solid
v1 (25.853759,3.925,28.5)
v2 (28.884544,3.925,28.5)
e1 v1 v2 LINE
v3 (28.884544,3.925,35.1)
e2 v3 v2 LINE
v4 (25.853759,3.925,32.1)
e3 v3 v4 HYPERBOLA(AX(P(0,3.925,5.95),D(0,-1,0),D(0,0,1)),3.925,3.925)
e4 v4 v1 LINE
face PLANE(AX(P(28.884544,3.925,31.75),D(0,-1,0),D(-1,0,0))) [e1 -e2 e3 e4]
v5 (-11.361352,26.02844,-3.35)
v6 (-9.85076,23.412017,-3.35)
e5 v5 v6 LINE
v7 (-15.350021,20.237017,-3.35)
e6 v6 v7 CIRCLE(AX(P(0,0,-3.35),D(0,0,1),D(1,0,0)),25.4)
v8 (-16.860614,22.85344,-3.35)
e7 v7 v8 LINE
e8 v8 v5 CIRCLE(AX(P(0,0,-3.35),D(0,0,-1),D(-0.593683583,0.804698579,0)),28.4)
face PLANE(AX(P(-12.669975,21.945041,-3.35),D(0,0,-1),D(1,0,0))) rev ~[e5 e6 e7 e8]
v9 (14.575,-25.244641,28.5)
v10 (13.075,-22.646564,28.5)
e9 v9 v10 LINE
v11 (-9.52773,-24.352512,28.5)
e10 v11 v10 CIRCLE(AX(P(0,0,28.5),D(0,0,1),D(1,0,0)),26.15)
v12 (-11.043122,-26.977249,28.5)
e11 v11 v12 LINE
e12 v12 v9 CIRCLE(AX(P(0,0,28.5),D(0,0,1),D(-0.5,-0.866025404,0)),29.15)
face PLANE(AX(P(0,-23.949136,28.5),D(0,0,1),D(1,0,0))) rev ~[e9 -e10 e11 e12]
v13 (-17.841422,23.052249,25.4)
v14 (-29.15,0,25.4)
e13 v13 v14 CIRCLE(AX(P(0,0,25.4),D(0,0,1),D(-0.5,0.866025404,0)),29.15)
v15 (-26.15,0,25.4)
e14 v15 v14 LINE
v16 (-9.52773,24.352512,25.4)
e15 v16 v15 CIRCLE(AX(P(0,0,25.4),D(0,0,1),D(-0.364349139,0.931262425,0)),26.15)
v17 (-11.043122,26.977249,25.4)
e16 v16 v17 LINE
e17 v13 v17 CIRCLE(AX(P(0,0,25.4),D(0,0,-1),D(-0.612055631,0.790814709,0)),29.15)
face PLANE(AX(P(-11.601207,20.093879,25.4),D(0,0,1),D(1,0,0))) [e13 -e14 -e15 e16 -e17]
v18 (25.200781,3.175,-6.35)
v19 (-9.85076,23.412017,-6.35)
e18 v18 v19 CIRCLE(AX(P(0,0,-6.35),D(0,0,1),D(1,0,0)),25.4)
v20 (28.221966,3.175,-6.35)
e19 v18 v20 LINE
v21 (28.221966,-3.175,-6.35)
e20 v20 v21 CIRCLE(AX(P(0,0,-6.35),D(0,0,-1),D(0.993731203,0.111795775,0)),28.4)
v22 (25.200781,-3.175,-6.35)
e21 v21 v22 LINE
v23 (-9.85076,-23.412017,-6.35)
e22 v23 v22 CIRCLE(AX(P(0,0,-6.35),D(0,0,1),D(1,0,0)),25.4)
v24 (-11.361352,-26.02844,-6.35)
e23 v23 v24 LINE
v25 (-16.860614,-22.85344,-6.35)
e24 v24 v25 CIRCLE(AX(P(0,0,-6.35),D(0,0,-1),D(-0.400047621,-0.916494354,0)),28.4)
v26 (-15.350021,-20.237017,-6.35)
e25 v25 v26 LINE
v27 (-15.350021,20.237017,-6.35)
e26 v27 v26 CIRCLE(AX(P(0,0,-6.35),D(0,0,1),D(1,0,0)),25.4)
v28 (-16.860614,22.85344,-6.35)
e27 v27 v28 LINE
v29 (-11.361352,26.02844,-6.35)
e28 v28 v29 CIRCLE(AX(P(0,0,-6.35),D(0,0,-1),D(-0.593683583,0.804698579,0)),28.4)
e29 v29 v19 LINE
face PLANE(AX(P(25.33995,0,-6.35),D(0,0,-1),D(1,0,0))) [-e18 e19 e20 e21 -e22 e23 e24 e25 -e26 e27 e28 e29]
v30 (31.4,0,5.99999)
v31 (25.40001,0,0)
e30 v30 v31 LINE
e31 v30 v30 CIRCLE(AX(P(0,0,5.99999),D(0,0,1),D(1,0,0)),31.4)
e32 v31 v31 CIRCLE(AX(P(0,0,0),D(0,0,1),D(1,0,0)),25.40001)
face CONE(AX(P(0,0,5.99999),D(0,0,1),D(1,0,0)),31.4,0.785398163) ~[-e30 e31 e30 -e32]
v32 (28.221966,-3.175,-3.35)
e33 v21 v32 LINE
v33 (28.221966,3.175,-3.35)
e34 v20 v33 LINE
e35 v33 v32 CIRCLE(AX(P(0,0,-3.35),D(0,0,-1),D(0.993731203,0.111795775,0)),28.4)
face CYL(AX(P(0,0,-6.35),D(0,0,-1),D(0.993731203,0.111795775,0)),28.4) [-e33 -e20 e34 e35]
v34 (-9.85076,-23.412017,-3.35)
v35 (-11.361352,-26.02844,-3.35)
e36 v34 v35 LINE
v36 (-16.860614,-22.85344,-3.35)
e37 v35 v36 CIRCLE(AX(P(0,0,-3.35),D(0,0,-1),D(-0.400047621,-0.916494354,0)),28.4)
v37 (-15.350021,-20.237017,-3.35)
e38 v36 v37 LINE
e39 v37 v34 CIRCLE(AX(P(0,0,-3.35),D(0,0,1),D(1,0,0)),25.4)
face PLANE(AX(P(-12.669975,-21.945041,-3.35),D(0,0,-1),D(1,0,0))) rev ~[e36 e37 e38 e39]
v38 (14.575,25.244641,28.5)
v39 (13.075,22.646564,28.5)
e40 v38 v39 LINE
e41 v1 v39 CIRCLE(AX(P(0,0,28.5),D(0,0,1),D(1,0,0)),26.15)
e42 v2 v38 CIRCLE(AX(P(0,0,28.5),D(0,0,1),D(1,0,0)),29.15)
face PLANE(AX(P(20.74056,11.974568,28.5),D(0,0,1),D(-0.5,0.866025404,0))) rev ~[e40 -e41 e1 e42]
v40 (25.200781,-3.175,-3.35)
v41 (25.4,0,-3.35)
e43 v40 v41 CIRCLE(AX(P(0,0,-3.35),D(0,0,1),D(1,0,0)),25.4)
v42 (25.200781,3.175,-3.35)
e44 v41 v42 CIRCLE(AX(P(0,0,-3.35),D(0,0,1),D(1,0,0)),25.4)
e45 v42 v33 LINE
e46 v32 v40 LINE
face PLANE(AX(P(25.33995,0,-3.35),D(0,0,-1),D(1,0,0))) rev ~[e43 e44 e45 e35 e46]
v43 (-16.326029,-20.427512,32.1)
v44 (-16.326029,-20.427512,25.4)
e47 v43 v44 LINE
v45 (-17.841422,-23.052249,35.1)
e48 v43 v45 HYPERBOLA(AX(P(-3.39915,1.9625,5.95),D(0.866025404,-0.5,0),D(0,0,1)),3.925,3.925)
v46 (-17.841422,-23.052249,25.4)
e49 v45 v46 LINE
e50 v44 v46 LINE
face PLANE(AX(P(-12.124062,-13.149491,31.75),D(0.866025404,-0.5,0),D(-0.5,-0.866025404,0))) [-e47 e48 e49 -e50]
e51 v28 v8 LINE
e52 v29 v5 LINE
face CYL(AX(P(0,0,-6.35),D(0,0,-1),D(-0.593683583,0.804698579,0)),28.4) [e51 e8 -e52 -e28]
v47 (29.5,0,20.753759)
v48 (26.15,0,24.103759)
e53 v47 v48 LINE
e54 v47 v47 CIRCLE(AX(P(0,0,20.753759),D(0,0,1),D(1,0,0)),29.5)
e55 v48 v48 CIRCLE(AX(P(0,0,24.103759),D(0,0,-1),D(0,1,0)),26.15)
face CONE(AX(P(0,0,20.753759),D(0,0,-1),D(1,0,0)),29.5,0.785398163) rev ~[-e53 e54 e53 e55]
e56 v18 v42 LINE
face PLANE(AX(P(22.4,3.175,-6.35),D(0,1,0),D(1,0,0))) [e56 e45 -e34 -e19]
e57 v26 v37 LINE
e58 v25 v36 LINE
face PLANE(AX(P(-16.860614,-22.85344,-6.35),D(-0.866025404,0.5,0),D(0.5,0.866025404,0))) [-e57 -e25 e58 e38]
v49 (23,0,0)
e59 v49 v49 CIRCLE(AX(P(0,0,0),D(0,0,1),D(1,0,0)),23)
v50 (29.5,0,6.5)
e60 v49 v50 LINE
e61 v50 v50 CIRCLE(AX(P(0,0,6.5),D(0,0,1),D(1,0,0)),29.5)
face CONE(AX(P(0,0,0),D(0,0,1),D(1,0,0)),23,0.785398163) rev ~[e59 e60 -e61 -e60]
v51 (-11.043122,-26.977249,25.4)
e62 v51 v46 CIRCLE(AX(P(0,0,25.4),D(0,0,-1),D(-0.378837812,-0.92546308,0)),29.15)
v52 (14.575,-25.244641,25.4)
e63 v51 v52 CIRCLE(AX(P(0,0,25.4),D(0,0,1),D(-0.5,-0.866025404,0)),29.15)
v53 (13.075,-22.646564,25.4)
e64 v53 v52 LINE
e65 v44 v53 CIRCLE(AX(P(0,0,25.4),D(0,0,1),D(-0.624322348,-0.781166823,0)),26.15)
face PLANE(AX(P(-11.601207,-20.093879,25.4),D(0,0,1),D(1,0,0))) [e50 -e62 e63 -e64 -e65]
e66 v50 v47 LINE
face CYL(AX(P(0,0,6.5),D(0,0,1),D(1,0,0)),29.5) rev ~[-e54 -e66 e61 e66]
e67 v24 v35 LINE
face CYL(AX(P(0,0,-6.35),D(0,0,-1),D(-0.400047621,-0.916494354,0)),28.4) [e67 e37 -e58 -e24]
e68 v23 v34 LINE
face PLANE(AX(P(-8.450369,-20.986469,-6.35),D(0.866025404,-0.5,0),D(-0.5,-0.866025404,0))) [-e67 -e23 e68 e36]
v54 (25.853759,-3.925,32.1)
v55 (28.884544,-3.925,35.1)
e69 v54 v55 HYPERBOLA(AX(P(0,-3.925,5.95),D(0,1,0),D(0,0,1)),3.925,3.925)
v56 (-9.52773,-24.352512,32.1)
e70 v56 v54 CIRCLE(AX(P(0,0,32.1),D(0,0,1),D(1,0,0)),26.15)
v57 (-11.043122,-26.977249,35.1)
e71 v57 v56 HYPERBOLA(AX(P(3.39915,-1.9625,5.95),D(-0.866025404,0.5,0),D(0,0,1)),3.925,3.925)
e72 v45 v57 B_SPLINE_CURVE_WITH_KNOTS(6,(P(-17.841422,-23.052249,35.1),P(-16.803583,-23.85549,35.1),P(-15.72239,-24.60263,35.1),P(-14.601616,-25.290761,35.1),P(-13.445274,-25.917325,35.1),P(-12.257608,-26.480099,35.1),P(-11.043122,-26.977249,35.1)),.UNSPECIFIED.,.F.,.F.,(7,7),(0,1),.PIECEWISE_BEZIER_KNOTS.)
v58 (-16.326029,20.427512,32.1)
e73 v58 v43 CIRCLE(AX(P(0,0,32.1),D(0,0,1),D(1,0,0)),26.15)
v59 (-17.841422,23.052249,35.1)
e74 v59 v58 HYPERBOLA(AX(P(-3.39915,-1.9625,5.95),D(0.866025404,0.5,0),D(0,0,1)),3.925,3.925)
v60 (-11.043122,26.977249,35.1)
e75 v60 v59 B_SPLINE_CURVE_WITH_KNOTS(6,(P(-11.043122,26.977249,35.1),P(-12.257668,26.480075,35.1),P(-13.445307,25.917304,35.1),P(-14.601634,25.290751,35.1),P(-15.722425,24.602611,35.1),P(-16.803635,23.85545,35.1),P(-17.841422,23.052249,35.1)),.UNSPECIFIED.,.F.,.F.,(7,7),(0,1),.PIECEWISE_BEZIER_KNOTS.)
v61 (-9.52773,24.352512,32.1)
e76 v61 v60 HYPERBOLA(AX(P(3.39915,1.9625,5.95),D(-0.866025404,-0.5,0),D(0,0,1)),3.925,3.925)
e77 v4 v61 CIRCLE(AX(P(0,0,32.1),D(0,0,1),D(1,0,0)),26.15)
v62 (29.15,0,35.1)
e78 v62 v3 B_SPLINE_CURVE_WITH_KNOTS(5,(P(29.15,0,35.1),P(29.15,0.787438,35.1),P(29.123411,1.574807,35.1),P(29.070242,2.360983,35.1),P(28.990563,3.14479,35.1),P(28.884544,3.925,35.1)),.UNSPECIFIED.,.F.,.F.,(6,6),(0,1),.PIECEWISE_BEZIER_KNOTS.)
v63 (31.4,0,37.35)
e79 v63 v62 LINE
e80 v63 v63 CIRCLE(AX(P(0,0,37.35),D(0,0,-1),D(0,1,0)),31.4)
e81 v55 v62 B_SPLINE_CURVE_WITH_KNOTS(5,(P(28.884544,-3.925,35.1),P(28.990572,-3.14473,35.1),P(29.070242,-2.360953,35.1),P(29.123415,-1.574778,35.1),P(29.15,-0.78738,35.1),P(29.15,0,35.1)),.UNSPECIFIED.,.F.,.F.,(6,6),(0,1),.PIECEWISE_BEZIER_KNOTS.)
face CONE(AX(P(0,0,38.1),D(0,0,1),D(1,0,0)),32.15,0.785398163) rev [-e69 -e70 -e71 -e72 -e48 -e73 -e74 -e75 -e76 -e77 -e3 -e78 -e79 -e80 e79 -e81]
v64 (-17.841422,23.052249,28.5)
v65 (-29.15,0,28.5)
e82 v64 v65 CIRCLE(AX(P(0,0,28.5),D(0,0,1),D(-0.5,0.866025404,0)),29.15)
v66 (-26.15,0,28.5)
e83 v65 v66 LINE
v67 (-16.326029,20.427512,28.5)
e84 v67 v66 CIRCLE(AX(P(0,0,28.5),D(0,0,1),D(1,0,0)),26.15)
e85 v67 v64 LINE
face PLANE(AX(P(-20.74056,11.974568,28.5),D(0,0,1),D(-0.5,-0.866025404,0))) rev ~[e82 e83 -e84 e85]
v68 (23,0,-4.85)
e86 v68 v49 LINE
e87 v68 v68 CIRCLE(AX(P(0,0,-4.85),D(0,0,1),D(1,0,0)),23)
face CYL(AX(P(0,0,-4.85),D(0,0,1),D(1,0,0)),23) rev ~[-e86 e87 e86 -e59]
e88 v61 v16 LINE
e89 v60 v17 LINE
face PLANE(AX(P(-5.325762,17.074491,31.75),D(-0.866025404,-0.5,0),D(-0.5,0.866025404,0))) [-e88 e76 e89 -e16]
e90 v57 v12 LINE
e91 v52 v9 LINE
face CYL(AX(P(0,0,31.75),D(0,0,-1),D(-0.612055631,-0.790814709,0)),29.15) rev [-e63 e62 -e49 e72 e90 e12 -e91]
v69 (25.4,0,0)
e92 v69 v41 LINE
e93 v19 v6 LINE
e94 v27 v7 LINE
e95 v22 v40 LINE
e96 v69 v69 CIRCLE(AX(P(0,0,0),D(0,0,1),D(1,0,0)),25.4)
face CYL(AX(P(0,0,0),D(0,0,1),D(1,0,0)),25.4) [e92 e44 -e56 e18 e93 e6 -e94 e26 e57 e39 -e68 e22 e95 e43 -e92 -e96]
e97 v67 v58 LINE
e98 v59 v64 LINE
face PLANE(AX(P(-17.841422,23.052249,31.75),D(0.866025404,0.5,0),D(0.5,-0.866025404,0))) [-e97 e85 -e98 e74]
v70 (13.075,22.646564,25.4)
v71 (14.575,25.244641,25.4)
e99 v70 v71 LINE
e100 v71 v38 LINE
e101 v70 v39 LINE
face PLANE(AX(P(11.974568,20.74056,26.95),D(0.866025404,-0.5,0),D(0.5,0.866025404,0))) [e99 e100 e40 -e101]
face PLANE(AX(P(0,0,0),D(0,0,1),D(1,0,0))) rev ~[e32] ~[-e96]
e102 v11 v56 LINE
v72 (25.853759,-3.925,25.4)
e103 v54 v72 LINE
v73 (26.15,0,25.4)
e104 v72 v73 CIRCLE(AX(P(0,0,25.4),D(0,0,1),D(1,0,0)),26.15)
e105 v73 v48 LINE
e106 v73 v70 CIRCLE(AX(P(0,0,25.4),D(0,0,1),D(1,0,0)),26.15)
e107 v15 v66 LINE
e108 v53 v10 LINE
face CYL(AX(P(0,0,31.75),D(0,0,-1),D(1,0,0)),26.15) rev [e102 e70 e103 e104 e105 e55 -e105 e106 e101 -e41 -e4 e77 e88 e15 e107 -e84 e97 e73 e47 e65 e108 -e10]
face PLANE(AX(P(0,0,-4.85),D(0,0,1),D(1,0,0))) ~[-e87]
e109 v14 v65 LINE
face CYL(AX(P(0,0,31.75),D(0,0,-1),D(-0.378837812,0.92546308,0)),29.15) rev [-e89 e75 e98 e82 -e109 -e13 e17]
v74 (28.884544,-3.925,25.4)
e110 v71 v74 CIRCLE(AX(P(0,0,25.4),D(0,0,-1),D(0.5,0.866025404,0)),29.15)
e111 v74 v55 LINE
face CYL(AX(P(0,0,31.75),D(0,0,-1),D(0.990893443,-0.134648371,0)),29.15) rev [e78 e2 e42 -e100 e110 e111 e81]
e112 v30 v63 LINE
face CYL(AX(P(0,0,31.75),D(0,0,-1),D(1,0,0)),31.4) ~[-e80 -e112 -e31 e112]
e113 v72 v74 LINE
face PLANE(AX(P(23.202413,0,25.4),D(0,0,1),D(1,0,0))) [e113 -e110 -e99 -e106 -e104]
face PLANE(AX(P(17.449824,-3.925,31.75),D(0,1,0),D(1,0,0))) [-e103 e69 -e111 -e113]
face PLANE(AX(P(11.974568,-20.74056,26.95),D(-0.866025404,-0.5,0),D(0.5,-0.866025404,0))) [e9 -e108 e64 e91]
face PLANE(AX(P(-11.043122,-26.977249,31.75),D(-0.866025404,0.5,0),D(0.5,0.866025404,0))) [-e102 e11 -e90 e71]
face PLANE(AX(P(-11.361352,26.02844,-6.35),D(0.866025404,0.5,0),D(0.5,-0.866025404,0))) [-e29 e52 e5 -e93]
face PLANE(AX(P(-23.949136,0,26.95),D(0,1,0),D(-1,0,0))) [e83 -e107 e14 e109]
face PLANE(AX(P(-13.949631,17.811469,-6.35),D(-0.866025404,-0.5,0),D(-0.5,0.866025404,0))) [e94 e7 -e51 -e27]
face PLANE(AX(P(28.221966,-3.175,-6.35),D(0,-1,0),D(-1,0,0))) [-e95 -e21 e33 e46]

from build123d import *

# Parameters (mm, degrees)
F0_R             = 25.4
F1_DEPTH         = 6.35
F3_DEPTH         = 3
F4_R             = 22.4
F5_DEPTH         = 3.35
F6_R             = 31.4
F6_R_2           = 22.4
F7_DEPTH         = 31.75
F9_DEPTH         = 6.35
F10_R            = 26.15
F11_DEPTH        = 28
F12_W            = 10.4017283041
F12_H            = 3.1
F14_COPIES_COUNT = 3
F16_SIZE         = 5.99999
F17_R            = 31.4
F17_R_2          = 26.15
F18_DEPTH        = 6.35
F20_DEPTH        = 25


# Not quite as in the source:
# - a fillet or chamfer that OpenCascade refuses, or shapes differently, is made with other operations: its cross-section is extruded or revolved along the edge and cut away or added
# - a fillet or chamfer is up to 0.001 mm smaller than in the source, because OpenCascade refuses the exact size
# - a pattern or mirror of a feature is missing from the dataset's text; its kind, count and spacing are read off the source's solid


with BuildPart() as f1:
    # F0 (on Top) → F1 (new body)
    with BuildSketch(Plane.XY):
        Circle(F0_R)
    extrude(amount=-F1_DEPTH)

    # F2 (on face) → F3 (join)
    with BuildSketch(Plane(origin=(0, 0, -6.35), x_dir=(1, 0, 0), z_dir=(0, 0, -1))):
        with BuildLine():
            ThreePointArc((28.2219661788, -3.175), (28.4, 0), (28.2219661788, 3.175))
            Line((28.2219661788, 3.175), (22.4, 3.175))
            Line((22.4, 3.175), (22.4, -3.175))
            Line((22.4, -3.175), (28.2219661788, -3.175))
        make_face()
        with BuildLine():
            Line((-8.450369343, 20.9864690448), (-11.3613524324, 26.0284396556))
            ThreePointArc((-11.3613524324, 26.0284396556), (-14.2, 24.5951214675), (-16.8606137464, 22.8534396556))
            Line((-16.8606137464, 22.8534396556), (-13.949630657, 17.8114690448))
            Line((-13.949630657, 17.8114690448), (-8.450369343, 20.9864690448))
        make_face()
        with BuildLine():
            Line((-13.949630657, -17.8114690448), (-16.8606137464, -22.8534396556))
            ThreePointArc((-16.8606137464, -22.8534396556), (-14.2, -24.5951214675), (-11.3613524324, -26.0284396556))
            Line((-11.3613524324, -26.0284396556), (-8.450369343, -20.9864690448))
            Line((-8.450369343, -20.9864690448), (-13.949630657, -17.8114690448))
        make_face()
    extrude(amount=-F3_DEPTH)

    # F4 (on face) → F5 (cut, through all)
    with BuildSketch(Plane.XY):
        Circle(F4_R)
    extrude(amount=-F5_DEPTH, mode=Mode.SUBTRACT)

    # F6 (on face) → F7 (join)
    with BuildSketch(Plane.XY):
        Circle(F6_R)
        Circle(F6_R_2, mode=Mode.SUBTRACT)
    extrude(amount=F7_DEPTH)

    # F8 (on face) → F9 (cut)
    with BuildSketch(Plane.XY.offset(31.75)):
        with BuildLine():
            Line((17.4498241395, -3.925), (28.8845438773, -3.925))
            ThreePointArc((28.8845438773, -3.925), (29.15, 0), (28.8845438773, 3.925))
            Line((28.8845438773, 3.925), (17.4498241395, 3.925))
            Line((17.4498241395, 3.925), (17.4498241395, 0))
            Line((17.4498241395, 0), (17.4498241395, -3.925))
        make_face()
        with BuildLine():
            Line((-5.3257623599, 17.0744909964), (-11.0431222288, 26.9772487745))
            ThreePointArc((-11.0431222288, 26.9772487745), (-14.575, 25.2446405203), (-17.8414216485, 23.0522487745))
            Line((-17.8414216485, 23.0522487745), (-12.1240617796, 13.1494909964))
            Line((-12.1240617796, 13.1494909964), (-8.7249120697, 15.1119909964))
            Line((-8.7249120697, 15.1119909964), (-5.3257623599, 17.0744909964))
        make_face()
        with BuildLine():
            Line((-12.1240617796, -13.1494909964), (-17.8414216485, -23.0522487745))
            ThreePointArc((-17.8414216485, -23.0522487745), (-14.575, -25.2446405203), (-11.0431222288, -26.9772487745))
            Line((-11.0431222288, -26.9772487745), (-5.3257623599, -17.0744909964))
            Line((-5.3257623599, -17.0744909964), (-8.7249120697, -15.1119909964))
            Line((-8.7249120697, -15.1119909964), (-12.1240617796, -13.1494909964))
        make_face()
    extrude(amount=-F9_DEPTH, mode=Mode.SUBTRACT)

    # F10 (on face) → F11 (cut)
    with BuildSketch(Plane.XY.offset(31.75)):
        Circle(F10_R)
    extrude(amount=-F11_DEPTH, mode=Mode.SUBTRACT)

    # F14: sweep along a path in F13
    with BuildLine(Plane.XY.offset(31.75)) as f14_path:
        ThreePointArc((37.4274057464, 0), (32.4130841741, 18.7137028732), (18.7137028732, 32.4130841741))
    # F12 (on Front) → F14 (sweep, cut)
    with BuildSketch(Plane.XZ):
        with Locations((23.949135848, 26.95)):
            Rectangle(F12_W, F12_H)
    f14 = sweep(path=f14_path.line, mode=Mode.SUBTRACT)

    # F14_copies: F14 ×3 about axis
    f14_copies_axis = Axis((0, 0, 0), (0, 0, 1))
    for i in range(1, F14_COPIES_COUNT):
        add(f14.rotate(f14_copies_axis, i * 360 / F14_COPIES_COUNT), mode=Mode.SUBTRACT)

    # F16 (size 6 in the source; OpenCascade refuses exactly that, so slightly less here)
    f16_edges = [f1.edges().sort_by_distance(p)[0] for p in [
        (-31.4, 0, 0),
    ]]
    chamfer(f16_edges, length=F16_SIZE)

    # F17 (on face) → F18 (join)
    with BuildSketch(Plane.XY.offset(31.75)):
        Circle(F17_R)
        Circle(F17_R_2, mode=Mode.SUBTRACT)
    extrude(amount=F18_DEPTH)

    # F19: chamfer of 6 on 1 edges, made by hand

    # F19_s1 → F19_t2 (revolve, cut)
    with BuildSketch(Plane.XZ):
        Polygon((32.15, 38.1), (26.15, 32.1), (26.15, 38.1), align=None)
    revolve(axis=Axis((0, 0, 38.1), (0, 0, 1)), mode=Mode.SUBTRACT)

    # F8 (on face) → F20 (cut)
    with BuildSketch(Plane.XY.offset(31.75)):
        with BuildLine():
            Line((17.4498241395, -3.925), (28.8845438773, -3.925))
            ThreePointArc((28.8845438773, -3.925), (29.15, 0), (28.8845438773, 3.925))
            Line((28.8845438773, 3.925), (17.4498241395, 3.925))
            Line((17.4498241395, 3.925), (17.4498241395, 0))
            Line((17.4498241395, 0), (17.4498241395, -3.925))
        make_face()
        with BuildLine():
            Line((-5.3257623599, 17.0744909964), (-11.0431222288, 26.9772487745))
            ThreePointArc((-11.0431222288, 26.9772487745), (-14.575, 25.2446405203), (-17.8414216485, 23.0522487745))
            Line((-17.8414216485, 23.0522487745), (-12.1240617796, 13.1494909964))
            Line((-12.1240617796, 13.1494909964), (-8.7249120697, 15.1119909964))
            Line((-8.7249120697, 15.1119909964), (-5.3257623599, 17.0744909964))
        make_face()
        with BuildLine():
            Line((-12.1240617796, -13.1494909964), (-17.8414216485, -23.0522487745))
            ThreePointArc((-17.8414216485, -23.0522487745), (-14.575, -25.2446405203), (-11.0431222288, -26.9772487745))
            Line((-11.0431222288, -26.9772487745), (-5.3257623599, -17.0744909964))
            Line((-5.3257623599, -17.0744909964), (-8.7249120697, -15.1119909964))
            Line((-8.7249120697, -15.1119909964), (-12.1240617796, -13.1494909964))
        make_face()
    extrude(amount=F20_DEPTH, mode=Mode.SUBTRACT)

    # F21 (on Front) → F22 (revolve, cut)
    with BuildSketch(Plane.XZ):
        Polygon((0, 0), (0, -4.85), (23, -4.85), (23, 0), (29.5, 6.5), (29.5, 20.7537593978), (25.8537593978, 24.4), (0, 24.4), align=None)
    revolve(axis=Axis((0, 0, 37.5208705664), (0, 0, 1)), mode=Mode.SUBTRACT)


solid = f1.part
